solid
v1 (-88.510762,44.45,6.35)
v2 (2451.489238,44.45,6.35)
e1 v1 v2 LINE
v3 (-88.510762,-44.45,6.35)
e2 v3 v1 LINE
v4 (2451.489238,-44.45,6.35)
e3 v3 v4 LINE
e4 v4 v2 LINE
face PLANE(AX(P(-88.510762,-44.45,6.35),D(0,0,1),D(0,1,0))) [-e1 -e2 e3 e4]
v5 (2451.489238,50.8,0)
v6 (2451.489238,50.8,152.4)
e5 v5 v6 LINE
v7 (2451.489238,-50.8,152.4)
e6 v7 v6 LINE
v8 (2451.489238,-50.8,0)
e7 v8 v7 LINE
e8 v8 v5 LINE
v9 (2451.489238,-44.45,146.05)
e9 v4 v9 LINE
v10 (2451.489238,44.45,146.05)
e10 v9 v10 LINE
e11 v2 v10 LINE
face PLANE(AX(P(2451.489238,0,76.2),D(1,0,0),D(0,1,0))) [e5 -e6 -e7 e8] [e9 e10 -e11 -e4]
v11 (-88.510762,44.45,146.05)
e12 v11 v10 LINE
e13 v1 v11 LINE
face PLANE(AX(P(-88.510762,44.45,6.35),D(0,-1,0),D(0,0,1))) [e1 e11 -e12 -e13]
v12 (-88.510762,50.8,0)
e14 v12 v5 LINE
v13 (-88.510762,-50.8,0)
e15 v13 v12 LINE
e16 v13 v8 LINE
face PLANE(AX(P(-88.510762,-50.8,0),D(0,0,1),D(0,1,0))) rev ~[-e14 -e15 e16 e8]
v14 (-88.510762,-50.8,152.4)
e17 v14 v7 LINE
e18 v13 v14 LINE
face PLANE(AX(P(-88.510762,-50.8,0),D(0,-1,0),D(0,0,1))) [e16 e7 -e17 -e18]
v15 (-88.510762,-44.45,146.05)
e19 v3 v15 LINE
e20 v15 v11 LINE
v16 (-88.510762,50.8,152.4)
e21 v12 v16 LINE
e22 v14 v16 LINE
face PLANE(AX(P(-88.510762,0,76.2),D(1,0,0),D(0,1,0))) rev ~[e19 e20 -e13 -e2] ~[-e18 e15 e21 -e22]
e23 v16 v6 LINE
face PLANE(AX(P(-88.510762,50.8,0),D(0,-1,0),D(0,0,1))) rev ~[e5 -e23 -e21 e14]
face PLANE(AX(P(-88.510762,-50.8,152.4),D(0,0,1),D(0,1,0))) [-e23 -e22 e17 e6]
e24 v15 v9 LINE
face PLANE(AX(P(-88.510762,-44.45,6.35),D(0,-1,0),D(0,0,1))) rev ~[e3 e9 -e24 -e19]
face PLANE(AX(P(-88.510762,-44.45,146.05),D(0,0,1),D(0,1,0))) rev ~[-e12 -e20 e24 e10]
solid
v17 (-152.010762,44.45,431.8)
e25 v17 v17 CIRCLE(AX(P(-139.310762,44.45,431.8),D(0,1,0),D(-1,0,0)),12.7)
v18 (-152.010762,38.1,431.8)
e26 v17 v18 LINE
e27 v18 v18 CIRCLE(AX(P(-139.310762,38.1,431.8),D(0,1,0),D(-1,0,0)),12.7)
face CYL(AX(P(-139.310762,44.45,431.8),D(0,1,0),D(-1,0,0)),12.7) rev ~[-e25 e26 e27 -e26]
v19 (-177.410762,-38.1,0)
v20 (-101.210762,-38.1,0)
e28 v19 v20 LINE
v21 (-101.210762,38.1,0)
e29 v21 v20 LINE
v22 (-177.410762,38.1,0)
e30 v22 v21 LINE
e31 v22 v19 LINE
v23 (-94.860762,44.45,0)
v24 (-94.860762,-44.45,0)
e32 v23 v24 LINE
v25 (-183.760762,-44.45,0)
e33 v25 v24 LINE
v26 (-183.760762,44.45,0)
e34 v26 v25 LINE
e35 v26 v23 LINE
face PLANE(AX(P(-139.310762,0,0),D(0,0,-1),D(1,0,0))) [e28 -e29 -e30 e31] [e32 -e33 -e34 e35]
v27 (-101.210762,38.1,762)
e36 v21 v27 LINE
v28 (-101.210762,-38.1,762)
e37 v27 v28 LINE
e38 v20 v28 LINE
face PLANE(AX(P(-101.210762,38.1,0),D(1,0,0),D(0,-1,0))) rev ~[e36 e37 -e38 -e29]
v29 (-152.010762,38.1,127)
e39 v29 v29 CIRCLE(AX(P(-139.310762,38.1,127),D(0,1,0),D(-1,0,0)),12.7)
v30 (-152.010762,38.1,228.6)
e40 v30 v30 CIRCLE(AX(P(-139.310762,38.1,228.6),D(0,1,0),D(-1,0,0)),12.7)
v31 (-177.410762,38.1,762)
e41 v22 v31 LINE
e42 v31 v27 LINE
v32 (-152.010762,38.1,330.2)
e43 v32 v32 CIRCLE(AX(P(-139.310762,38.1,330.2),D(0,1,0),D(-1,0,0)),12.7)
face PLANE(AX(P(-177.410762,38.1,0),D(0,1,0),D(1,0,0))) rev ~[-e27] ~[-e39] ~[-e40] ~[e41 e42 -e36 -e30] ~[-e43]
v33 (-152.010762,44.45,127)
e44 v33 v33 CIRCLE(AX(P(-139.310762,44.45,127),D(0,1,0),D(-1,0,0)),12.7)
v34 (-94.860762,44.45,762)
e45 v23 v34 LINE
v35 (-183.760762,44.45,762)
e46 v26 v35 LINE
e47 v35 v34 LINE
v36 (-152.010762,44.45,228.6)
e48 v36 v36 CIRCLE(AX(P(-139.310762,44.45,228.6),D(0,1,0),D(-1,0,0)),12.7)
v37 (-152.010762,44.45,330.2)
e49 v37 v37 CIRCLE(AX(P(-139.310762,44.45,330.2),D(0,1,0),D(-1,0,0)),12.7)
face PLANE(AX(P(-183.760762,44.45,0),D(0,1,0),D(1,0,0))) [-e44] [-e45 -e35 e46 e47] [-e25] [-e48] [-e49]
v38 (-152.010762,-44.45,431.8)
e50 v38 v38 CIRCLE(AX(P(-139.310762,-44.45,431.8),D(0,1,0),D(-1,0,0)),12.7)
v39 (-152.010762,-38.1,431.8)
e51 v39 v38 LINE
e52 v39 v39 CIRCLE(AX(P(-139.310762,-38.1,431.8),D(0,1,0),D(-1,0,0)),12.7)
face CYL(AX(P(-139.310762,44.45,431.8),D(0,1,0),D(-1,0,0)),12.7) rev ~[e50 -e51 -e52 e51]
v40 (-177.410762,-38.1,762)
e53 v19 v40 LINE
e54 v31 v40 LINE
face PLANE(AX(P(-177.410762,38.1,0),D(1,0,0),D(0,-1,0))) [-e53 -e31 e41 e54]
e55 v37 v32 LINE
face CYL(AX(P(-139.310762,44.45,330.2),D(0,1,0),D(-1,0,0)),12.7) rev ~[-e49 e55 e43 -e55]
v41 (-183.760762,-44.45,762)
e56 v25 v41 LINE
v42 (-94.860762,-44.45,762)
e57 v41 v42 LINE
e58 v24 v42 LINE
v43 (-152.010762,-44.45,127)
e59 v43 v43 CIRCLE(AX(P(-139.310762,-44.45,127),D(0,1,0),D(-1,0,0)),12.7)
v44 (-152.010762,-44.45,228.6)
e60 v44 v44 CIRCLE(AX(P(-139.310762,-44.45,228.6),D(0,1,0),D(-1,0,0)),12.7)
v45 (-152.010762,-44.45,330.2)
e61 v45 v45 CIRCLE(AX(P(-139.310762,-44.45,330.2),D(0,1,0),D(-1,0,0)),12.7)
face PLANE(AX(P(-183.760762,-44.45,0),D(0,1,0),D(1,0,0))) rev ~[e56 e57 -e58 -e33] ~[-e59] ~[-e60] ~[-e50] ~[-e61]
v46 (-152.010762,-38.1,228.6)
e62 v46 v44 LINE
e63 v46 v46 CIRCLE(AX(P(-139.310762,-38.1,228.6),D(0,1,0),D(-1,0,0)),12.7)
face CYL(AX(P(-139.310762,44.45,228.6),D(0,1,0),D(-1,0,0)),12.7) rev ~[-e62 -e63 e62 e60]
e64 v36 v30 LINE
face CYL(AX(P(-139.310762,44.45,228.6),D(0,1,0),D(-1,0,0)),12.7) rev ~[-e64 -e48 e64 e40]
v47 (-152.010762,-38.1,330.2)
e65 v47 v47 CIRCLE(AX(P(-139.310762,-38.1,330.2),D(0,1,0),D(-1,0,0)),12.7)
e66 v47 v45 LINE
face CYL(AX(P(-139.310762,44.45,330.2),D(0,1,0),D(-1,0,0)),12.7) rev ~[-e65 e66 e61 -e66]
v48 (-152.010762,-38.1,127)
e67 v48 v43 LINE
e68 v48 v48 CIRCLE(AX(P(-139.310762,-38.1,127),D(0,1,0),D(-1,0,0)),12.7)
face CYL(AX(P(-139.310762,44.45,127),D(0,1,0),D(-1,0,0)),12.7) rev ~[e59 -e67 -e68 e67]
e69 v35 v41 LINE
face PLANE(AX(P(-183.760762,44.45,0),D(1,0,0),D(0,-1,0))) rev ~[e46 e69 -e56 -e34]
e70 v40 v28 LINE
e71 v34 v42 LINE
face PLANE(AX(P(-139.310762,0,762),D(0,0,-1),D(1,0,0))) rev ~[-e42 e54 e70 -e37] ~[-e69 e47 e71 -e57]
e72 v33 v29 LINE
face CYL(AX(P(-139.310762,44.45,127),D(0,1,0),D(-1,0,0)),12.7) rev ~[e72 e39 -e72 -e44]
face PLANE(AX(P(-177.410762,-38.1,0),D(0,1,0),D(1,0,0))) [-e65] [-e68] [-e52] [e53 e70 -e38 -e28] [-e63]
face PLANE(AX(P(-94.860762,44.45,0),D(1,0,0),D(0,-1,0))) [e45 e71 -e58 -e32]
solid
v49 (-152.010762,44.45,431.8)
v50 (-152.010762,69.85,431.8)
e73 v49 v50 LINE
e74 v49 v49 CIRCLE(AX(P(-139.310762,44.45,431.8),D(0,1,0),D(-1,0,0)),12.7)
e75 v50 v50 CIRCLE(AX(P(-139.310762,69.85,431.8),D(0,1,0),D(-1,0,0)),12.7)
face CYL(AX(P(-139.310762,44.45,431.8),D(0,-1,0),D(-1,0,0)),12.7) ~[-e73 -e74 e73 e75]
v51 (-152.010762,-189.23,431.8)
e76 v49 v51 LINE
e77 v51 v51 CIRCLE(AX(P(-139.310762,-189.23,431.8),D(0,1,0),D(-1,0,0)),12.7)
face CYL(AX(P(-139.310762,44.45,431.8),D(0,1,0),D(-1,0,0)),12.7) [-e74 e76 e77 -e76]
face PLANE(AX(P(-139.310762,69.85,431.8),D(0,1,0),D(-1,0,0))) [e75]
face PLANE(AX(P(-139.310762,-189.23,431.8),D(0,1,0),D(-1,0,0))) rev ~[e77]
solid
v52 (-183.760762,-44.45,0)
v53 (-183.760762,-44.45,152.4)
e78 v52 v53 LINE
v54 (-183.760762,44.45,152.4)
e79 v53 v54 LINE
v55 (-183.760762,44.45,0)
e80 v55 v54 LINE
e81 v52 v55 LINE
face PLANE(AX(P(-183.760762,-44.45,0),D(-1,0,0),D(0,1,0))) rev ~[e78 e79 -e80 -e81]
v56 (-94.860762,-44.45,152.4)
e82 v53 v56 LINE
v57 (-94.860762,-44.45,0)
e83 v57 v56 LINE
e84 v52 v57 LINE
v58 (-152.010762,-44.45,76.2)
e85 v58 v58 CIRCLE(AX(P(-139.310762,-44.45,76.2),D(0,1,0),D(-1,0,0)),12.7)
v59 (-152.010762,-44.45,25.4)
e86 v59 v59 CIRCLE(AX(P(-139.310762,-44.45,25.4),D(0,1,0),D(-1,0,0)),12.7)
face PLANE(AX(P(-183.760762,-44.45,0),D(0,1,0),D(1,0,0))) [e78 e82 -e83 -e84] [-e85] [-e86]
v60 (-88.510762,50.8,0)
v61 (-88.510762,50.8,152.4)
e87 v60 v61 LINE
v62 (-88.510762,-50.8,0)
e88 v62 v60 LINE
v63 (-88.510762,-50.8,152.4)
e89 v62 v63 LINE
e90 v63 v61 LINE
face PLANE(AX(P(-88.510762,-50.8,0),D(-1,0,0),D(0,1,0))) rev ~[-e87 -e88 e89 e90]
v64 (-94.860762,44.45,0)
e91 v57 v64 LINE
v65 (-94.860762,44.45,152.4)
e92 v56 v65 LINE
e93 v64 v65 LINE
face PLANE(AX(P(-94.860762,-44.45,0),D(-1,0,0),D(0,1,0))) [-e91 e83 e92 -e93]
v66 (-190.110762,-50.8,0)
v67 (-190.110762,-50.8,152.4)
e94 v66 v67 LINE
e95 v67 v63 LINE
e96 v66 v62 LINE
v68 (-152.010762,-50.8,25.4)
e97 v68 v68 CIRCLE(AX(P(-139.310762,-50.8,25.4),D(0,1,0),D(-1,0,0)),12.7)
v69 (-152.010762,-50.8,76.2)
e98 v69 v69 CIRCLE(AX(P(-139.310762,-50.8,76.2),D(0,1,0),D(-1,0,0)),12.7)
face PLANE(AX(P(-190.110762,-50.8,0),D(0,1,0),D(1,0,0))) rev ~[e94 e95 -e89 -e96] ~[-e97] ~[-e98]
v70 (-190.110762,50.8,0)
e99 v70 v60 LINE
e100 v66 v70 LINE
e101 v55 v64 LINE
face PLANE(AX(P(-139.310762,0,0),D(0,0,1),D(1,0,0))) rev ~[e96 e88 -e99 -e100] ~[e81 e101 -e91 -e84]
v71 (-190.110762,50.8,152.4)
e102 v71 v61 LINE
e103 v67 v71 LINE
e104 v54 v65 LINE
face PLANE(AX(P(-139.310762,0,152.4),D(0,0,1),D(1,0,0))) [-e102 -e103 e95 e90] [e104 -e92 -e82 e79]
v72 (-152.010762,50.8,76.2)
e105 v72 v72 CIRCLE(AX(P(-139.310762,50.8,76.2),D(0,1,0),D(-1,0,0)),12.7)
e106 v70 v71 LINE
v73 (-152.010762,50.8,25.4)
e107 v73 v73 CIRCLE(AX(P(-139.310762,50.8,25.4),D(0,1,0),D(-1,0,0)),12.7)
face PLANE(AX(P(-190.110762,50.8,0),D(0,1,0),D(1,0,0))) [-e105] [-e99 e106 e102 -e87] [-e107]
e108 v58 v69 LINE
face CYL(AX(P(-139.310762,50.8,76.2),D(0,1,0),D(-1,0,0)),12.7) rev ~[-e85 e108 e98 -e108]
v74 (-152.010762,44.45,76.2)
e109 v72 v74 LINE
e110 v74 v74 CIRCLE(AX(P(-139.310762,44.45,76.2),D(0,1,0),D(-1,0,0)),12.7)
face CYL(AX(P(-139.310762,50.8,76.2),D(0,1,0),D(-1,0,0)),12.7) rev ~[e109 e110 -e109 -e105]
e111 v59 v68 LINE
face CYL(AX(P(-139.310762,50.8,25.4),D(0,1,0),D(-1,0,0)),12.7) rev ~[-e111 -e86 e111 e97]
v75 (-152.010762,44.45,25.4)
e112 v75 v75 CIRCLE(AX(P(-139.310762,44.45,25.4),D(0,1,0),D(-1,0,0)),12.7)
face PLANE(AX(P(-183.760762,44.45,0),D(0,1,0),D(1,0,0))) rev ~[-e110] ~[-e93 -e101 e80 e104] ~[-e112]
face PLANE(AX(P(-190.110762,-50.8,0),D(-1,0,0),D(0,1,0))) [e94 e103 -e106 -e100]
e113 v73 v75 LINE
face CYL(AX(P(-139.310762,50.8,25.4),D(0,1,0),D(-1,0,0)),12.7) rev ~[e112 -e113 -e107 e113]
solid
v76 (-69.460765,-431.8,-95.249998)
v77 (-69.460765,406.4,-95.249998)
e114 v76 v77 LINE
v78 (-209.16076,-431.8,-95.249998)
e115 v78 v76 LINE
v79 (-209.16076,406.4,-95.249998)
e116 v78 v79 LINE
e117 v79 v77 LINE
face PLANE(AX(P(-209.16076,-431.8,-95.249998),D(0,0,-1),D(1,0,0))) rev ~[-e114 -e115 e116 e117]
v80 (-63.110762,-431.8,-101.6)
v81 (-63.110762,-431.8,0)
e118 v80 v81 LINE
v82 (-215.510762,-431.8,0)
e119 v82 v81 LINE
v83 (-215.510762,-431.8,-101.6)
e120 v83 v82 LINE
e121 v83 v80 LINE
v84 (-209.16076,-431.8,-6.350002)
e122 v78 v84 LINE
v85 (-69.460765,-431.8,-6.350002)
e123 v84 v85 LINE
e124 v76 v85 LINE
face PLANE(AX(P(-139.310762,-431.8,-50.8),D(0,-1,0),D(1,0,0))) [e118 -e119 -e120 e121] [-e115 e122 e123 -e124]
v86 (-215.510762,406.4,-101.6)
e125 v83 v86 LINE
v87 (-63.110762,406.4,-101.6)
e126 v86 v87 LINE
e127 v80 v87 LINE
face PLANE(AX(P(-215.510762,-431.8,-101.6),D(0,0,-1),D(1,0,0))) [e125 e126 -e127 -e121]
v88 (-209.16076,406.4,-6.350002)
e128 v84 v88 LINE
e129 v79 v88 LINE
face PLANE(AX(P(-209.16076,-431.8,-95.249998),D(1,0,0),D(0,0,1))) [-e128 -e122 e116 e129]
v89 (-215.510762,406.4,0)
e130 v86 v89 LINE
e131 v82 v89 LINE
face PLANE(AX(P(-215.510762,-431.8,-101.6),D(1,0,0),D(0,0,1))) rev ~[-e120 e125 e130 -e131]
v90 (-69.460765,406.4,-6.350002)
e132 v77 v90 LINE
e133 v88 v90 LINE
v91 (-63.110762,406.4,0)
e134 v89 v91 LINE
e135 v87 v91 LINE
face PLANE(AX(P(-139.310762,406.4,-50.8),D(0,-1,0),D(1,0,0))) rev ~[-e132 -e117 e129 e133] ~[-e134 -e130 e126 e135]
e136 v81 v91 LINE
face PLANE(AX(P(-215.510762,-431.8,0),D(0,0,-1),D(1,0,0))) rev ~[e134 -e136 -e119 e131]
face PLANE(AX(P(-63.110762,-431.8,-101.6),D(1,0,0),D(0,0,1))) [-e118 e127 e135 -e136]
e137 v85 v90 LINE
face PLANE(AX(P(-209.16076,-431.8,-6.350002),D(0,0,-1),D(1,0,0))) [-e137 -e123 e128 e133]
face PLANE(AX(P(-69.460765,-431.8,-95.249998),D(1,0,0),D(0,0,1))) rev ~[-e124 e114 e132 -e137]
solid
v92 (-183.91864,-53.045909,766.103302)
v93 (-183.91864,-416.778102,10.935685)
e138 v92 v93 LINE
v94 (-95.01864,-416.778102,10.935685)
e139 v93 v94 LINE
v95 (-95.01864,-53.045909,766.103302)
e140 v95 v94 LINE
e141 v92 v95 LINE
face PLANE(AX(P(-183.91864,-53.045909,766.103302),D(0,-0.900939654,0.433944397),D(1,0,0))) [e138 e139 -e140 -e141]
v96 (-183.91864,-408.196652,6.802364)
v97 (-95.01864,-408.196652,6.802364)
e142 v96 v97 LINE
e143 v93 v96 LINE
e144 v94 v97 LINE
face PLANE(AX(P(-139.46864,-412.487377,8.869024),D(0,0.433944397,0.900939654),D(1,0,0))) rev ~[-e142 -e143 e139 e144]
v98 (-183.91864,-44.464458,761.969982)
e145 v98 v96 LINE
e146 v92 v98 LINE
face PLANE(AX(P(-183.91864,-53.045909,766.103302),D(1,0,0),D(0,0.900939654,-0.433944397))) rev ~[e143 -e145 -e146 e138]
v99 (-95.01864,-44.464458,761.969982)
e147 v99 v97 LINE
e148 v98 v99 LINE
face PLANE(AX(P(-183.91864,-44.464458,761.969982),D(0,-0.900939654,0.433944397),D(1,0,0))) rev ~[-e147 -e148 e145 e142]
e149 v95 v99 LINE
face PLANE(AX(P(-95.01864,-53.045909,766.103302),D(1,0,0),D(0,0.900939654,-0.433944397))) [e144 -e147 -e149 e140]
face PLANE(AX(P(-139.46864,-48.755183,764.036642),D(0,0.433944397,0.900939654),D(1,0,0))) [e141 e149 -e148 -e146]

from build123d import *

# Parameters (mm, degrees)
F0_W           = 101.6
F0_H           = 101.6
F0_W_2         = 88.8999998569
F0_H_2         = 88.8999998569
F1_DEPTH       = 152.4
F2_W           = 88.8999998569
F2_H           = 88.8999998569
F2_W_2         = 76.1999998569
F2_H_2         = 76.1999998569
F3_DEPTH       = 762
F4_W           = 101.6
F4_H           = 152.4
F4_W_2         = 88.9
F4_H_2         = 139.7
F5_DEPTH       = 2540
F7_W           = 152.4
F7_H           = 101.6
F7_W_2         = 139.6999955177
F7_H_2         = 88.8999955177
F8_DEPTH       = 838.2
F12_W          = 88.9
F12_H          = 9.525
F13_DEPTH      = 838.2
F14_R          = 12.7
F15_DEPTH      = 482.601
F16_R          = 12.7
F17_DEPTH      = 476.2509999285
F18_DEPTH      = 233.68
F18_DEPTH_BACK = 25.4
F19_R          = 12.7
F20_DEPTH      = 482.601


with BuildPart() as f1:
    # F0 (on Top) → F1 (new body)
    with BuildSketch(Plane.XY):
        with Locations((-139.3107622862, 0)):
            Rectangle(F0_W, F0_H)
        with Locations((-139.3107622862, 0)):
            Rectangle(F0_W_2, F0_H_2, mode=Mode.SUBTRACT)
    extrude(amount=F1_DEPTH)

    # F14 (on face) → F15 (cut, through all)
    with BuildSketch(Plane(origin=(0, 50.8, 0), x_dir=(-1, 0, 0), z_dir=(0, 1, 0))):
        with Locations((139.3107622862, 25.4)):
            Circle(F14_R)
    extrude(amount=-F15_DEPTH, mode=Mode.SUBTRACT)

    # F19 (on face) → F20 (cut, through all)
    with BuildSketch(Plane(origin=(0, 50.8, 0), x_dir=(-1, 0, 0), z_dir=(0, 1, 0))):
        with Locations((139.3107622862, 76.2)):
            Circle(F19_R)
    extrude(amount=-F20_DEPTH, mode=Mode.SUBTRACT)


with BuildPart() as f3:
    # F2 (on face) → F3 (new body)
    with BuildSketch(Plane(origin=(0, 0, 0), x_dir=(1, 0, 0), z_dir=(0, 0, -1))):
        with Locations((-139.3107622862, 0)):
            Rectangle(F2_W, F2_H)
        with Locations((-139.3107622862, 0)):
            Rectangle(F2_W_2, F2_H_2, mode=Mode.SUBTRACT)
    extrude(amount=-F3_DEPTH)

    # F16 (on face) → F17 (cut, through all)
    with BuildSketch(Plane(origin=(0, 44.4499999285, 0), x_dir=(-1, 0, 0), z_dir=(0, 1, 0))):
        with Locations((139.3107622862, 431.8)):
            Circle(F16_R)
        with Locations((139.3107622862, 330.2)):
            Circle(F16_R)
        with Locations((139.3107622862, 228.6)):
            Circle(F16_R)
        with Locations((139.3107622862, 127)):
            Circle(F16_R)
    extrude(amount=-F17_DEPTH, mode=Mode.SUBTRACT)


with BuildPart() as f5:
    # F4 (on face) → F5 (new body)
    with BuildSketch(Plane.YZ.offset(-88.5107622862)):
        with Locations((0, 76.2)):
            Rectangle(F4_W, F4_H)
        with Locations((0, 76.2)):
            Rectangle(F4_W_2, F4_H_2, mode=Mode.SUBTRACT)
    extrude(amount=F5_DEPTH)


with BuildPart() as f8:
    # F7 (on offset) → F8 (new body)
    with BuildSketch(Plane.XZ.offset(431.8)):
        with Locations((-139.3107622862, -50.8)):
            Rectangle(F7_W, F7_H)
        with Locations((-139.3107622862, -50.8)):
            Rectangle(F7_W_2, F7_H_2, mode=Mode.SUBTRACT)
    extrude(amount=-F8_DEPTH)


with BuildPart() as f13:
    # F12 (on face) → F13 (new body)
    with BuildSketch(Plane(origin=(0, 289.5250416317, 601.1014136742), x_dir=(1, 0, 0), z_dir=(0, 0.4339443975, 0.9009396539))):
        with Locations((-139.4686400175, -375.4748984393)):
            Rectangle(F12_W, F12_H)
    extrude(amount=-F13_DEPTH)


with BuildPart() as f18:
    # F16 (on face) → F18 (new body, two sides)
    with BuildSketch(Plane(origin=(0, 44.4499999285, 0), x_dir=(-1, 0, 0), z_dir=(0, 1, 0))) as f18_sk:
        with Locations((139.3107622862, 431.8)):
            Circle(F16_R)
    extrude(amount=-F18_DEPTH)
    extrude(f18_sk.sketch, amount=F18_DEPTH_BACK)


solid = Compound([f1.part, f3.part, f5.part, f8.part, f13.part, f18.part])
